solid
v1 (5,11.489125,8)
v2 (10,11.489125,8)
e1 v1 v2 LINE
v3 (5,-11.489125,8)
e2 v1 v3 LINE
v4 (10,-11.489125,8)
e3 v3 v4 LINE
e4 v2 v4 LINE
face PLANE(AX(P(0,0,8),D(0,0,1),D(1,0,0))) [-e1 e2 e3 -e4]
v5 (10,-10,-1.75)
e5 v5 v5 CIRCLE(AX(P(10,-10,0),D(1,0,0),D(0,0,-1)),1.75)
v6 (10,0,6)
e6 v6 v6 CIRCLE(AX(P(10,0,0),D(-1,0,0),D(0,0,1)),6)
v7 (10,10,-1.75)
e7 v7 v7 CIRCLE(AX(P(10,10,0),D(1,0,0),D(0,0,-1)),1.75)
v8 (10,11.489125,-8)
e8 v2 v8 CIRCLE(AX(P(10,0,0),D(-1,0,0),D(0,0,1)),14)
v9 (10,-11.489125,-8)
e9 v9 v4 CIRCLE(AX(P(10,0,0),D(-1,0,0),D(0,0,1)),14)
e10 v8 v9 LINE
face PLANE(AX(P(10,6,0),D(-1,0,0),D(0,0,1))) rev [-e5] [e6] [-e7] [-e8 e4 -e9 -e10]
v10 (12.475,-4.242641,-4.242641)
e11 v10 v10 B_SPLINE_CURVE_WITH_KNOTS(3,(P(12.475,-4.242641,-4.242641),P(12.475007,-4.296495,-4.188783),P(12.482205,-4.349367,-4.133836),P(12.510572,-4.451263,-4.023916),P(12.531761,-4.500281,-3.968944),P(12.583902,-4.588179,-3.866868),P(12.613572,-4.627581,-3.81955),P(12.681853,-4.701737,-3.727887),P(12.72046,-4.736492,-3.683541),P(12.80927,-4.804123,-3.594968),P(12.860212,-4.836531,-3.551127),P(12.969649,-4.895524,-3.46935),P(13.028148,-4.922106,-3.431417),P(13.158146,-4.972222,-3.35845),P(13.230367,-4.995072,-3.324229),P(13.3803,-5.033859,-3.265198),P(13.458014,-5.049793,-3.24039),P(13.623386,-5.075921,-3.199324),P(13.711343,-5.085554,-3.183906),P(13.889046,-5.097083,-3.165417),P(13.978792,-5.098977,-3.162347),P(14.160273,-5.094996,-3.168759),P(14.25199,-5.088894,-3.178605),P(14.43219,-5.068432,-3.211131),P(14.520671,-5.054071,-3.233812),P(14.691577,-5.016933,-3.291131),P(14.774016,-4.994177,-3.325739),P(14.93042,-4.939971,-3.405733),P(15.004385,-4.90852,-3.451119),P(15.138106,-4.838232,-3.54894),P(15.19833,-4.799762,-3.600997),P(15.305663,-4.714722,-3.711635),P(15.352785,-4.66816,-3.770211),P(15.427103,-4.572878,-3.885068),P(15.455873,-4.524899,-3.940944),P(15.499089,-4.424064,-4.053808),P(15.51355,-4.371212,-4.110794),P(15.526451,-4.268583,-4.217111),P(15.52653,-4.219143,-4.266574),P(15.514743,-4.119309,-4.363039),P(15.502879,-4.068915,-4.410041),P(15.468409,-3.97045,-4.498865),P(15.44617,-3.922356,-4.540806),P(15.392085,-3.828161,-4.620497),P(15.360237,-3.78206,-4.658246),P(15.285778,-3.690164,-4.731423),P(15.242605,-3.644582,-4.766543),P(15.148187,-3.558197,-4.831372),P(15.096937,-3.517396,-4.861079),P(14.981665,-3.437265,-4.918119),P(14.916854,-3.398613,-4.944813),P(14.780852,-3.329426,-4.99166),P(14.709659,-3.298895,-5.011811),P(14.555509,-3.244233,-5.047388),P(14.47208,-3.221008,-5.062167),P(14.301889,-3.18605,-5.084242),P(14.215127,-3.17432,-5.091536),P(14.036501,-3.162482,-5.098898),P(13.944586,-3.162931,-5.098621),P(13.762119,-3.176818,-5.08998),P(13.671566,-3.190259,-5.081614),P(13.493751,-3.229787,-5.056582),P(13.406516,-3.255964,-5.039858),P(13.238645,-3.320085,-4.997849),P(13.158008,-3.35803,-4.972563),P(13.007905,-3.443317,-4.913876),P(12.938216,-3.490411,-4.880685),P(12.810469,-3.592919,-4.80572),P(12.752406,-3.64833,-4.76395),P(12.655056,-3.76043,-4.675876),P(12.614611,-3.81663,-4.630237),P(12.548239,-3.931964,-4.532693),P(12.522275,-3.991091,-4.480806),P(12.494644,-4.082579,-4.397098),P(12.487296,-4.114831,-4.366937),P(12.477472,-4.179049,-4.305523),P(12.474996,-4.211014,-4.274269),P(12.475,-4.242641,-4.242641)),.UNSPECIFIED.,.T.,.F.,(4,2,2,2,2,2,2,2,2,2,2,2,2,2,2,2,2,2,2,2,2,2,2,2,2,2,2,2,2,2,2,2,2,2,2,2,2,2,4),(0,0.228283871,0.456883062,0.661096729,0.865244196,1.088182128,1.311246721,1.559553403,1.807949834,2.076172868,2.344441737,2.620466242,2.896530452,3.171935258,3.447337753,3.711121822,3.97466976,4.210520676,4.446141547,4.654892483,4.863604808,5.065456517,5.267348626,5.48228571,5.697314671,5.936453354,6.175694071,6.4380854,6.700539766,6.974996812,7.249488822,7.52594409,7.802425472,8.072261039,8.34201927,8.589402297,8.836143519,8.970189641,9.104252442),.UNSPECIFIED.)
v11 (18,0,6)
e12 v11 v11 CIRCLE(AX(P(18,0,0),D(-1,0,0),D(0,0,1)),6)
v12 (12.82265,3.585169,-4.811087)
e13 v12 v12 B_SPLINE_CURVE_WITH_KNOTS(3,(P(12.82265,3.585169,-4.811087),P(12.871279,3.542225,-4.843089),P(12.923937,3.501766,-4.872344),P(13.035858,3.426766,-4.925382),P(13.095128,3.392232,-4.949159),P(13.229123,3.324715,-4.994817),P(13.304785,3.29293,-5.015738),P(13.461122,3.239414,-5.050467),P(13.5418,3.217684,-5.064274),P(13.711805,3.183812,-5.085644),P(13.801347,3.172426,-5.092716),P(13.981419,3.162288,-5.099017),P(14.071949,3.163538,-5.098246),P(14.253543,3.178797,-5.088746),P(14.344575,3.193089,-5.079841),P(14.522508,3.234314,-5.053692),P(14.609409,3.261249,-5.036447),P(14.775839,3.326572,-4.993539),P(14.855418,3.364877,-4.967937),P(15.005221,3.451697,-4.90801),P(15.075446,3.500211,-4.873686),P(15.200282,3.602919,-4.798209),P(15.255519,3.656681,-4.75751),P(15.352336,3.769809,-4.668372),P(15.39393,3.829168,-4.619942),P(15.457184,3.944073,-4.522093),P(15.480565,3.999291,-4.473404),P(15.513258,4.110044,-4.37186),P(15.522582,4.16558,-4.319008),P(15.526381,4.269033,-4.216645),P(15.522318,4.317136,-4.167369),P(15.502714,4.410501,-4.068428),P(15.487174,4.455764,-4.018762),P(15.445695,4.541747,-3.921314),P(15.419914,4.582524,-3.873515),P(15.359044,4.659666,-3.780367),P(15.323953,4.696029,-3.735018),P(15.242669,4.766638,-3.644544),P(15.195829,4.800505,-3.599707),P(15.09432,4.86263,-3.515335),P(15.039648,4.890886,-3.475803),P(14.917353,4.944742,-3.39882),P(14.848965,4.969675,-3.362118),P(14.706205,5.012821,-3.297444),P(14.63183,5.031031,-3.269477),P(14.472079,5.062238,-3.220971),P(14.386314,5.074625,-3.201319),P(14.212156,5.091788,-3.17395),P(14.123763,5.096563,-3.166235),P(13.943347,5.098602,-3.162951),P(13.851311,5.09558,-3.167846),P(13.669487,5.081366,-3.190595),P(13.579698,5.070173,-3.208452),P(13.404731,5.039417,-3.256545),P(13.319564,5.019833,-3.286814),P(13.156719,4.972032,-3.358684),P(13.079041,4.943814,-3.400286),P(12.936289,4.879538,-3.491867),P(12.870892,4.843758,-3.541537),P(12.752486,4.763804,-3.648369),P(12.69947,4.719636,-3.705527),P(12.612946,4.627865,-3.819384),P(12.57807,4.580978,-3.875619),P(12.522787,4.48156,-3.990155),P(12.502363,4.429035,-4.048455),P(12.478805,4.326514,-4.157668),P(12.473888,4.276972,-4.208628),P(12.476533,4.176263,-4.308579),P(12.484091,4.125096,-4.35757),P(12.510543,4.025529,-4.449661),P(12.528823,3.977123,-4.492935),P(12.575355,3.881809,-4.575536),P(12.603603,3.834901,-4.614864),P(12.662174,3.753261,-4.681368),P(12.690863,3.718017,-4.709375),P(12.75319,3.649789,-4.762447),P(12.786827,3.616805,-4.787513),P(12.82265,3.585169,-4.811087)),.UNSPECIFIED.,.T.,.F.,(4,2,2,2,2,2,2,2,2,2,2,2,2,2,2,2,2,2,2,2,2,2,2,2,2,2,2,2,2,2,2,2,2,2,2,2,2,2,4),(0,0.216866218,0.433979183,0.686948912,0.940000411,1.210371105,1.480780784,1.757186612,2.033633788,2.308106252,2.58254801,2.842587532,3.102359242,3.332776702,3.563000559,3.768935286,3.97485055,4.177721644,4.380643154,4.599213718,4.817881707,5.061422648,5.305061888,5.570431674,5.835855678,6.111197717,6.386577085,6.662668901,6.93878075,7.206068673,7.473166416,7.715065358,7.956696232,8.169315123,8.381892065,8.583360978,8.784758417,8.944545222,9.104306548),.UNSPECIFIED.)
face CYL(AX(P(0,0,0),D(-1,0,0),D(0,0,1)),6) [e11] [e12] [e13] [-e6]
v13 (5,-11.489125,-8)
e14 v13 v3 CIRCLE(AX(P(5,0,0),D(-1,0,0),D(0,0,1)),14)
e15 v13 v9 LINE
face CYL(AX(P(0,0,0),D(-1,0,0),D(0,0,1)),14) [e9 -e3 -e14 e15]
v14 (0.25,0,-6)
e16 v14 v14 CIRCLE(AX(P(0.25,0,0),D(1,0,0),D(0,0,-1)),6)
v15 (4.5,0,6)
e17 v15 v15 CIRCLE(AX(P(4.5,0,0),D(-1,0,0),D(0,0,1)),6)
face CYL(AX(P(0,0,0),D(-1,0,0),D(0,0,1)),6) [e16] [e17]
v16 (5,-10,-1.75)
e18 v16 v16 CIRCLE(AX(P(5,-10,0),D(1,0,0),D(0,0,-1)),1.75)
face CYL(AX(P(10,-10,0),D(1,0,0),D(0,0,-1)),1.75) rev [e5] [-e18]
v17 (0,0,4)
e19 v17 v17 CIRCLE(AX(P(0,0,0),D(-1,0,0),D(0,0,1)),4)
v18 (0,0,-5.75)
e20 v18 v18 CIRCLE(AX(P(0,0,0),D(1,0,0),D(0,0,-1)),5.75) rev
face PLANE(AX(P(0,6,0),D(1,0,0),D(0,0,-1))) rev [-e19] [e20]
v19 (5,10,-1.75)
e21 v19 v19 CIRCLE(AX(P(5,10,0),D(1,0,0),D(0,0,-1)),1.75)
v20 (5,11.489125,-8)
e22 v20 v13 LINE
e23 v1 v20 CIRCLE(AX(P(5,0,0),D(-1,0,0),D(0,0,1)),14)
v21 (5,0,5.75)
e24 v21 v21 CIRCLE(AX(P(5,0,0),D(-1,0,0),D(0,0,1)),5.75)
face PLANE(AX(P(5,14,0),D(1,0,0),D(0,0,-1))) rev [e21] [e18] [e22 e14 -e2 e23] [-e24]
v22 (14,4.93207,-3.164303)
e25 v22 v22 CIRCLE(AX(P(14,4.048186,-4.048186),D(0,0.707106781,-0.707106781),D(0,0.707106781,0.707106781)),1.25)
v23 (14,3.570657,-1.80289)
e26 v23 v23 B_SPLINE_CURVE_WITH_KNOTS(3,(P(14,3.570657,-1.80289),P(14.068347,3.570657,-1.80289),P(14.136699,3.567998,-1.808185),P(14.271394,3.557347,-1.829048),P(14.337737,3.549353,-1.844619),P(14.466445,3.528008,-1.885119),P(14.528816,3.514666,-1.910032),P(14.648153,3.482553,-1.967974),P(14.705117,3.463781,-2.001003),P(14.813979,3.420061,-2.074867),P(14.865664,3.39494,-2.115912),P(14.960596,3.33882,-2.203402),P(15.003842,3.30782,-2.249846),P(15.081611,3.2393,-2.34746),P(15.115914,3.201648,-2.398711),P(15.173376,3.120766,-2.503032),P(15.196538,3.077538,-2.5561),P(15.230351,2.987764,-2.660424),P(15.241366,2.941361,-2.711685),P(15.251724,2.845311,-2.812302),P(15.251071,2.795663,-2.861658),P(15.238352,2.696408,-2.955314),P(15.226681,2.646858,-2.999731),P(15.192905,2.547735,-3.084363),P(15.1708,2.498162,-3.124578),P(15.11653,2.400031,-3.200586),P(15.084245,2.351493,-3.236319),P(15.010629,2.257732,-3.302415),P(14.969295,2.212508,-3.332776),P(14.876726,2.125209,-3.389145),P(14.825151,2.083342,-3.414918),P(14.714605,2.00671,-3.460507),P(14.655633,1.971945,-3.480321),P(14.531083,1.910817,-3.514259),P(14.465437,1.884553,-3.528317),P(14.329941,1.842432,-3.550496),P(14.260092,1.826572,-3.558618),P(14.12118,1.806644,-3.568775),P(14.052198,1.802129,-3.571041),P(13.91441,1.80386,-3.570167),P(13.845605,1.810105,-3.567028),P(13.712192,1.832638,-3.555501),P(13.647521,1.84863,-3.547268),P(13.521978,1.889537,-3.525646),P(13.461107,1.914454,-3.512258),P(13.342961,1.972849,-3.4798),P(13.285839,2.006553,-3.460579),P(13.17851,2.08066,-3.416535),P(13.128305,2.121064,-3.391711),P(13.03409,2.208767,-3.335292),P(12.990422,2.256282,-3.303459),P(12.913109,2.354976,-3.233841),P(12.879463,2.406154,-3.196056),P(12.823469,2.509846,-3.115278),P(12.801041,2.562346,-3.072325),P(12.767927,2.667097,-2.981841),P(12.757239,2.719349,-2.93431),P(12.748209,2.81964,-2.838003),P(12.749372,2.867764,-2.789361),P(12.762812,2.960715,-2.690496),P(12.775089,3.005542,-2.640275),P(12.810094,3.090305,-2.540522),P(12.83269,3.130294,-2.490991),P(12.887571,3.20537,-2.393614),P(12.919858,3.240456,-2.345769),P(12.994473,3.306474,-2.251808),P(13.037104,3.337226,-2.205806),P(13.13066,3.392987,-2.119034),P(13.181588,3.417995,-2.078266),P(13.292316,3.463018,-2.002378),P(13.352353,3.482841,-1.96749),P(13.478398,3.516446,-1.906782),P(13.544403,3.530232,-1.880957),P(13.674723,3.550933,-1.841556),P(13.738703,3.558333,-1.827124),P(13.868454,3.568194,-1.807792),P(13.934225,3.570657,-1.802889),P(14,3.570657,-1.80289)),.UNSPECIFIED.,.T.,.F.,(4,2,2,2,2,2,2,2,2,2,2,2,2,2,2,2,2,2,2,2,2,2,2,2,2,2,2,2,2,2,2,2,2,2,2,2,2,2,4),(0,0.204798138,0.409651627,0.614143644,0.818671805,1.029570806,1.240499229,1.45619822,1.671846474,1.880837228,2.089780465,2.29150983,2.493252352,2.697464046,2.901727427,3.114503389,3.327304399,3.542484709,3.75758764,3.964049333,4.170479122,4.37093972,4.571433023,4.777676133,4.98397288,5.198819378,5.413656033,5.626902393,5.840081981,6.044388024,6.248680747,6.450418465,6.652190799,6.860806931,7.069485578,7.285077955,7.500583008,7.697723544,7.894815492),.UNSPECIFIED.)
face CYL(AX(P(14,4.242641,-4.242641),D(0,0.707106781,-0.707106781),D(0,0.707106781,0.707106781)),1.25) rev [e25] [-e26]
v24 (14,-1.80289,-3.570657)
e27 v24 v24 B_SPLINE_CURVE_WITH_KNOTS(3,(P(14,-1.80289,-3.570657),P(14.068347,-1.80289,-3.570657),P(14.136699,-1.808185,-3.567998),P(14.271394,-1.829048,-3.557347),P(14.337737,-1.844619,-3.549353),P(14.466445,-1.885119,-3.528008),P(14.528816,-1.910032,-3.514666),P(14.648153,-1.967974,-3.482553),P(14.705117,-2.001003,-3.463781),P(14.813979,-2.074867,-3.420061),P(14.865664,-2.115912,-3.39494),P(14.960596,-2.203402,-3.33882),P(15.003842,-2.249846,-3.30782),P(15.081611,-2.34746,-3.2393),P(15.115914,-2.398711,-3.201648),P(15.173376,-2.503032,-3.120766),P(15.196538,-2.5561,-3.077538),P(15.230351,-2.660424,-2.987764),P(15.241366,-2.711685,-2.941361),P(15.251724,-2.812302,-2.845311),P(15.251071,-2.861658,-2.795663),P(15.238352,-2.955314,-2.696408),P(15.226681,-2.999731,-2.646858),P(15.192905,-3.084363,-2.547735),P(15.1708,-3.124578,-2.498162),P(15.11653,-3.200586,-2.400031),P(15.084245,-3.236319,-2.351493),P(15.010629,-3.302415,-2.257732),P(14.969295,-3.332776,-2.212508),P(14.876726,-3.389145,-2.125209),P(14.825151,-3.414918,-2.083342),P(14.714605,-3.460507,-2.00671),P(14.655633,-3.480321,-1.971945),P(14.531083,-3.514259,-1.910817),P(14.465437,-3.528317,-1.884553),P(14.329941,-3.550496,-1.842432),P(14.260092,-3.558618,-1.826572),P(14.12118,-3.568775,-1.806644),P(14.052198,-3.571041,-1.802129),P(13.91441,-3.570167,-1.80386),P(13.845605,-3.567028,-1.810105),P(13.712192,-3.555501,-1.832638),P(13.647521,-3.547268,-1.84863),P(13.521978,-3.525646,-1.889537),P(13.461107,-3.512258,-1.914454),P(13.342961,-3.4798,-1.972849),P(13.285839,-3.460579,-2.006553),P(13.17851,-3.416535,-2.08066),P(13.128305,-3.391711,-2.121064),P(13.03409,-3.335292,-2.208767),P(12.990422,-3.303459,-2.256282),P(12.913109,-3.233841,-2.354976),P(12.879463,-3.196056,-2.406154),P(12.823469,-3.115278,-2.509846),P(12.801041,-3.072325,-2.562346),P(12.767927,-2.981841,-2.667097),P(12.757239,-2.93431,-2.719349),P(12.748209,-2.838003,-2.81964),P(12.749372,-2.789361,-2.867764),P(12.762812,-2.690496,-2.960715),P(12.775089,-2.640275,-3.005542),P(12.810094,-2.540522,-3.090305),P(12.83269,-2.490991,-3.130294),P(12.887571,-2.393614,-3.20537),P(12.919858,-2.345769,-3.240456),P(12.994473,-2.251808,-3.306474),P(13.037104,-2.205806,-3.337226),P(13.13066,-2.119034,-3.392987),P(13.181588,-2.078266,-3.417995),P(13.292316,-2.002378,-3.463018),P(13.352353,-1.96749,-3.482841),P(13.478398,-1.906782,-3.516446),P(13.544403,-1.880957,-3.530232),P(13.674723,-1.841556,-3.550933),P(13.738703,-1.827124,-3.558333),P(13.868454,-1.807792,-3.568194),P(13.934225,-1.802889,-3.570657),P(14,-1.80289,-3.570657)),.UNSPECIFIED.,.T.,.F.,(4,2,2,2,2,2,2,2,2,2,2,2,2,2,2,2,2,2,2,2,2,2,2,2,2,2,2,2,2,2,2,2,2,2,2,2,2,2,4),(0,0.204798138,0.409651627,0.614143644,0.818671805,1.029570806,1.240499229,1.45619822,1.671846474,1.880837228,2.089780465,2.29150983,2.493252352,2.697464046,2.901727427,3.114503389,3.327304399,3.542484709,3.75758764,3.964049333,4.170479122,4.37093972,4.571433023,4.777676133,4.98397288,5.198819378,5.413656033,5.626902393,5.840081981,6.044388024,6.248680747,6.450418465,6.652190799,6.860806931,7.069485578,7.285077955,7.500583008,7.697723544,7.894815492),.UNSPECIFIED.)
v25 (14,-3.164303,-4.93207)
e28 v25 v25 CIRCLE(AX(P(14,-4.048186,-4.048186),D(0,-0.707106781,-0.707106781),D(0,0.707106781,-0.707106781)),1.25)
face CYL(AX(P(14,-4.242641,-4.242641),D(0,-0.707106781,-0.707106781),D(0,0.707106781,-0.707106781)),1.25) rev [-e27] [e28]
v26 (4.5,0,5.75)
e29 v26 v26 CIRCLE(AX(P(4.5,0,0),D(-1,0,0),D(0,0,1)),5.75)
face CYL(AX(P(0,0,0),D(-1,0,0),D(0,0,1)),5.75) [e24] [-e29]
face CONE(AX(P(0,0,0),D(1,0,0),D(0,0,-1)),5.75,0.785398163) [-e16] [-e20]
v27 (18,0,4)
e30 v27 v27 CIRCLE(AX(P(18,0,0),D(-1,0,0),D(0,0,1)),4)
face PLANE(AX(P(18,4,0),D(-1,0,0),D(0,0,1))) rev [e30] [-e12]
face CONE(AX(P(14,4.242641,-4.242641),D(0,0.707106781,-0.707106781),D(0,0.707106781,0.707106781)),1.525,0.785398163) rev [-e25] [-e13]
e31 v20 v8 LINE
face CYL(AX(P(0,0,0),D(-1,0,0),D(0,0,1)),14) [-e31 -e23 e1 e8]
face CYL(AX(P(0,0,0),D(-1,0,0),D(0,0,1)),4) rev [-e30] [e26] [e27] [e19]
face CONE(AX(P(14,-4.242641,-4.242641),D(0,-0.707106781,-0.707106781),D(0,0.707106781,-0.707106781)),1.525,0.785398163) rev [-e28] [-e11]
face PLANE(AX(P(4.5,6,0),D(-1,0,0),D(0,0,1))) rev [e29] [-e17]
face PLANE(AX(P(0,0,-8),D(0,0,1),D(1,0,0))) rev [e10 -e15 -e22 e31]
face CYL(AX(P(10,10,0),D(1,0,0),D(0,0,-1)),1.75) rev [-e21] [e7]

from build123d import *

# Parameters (mm, degrees)
CUT_EXTRUDE_1_DEPTH = 23.181073013
CHAMFER_1_SIZE      = 0.25
HOLE_WIZARD_1_D     = 3.5


# Read off the part's stored shape, not the designer's step: M3 螺纹孔3
with BuildPart() as part:
    # 草图2 → 旋转1 (revolve)
    with BuildSketch(Plane.XY, mode=Mode.PRIVATE) as revolve_1_sk:
        Polygon((18, 4), (18, 6), (10, 6), (10, 14), (5, 14), (5, 5.75), (4.5, 5.75), (4.5, 6), (0, 6), (0, 4), align=None)
    revolve(revolve_1_sk.sketch.rotate(Axis((0, 0, 0), (1, 0, 0)), 90), axis=Axis((0, 0, 0), (1, 0, 0)))

    # 草图3 → 切除-拉伸1 (cut, through all)
    with BuildSketch(Plane(origin=(10, 0, 0), x_dir=(0, 0, -1), z_dir=(1, 0, 0))):
        with BuildLine():
            Line((-8, -11.489125293), (-8, 11.489125293))
            ThreePointArc((-8, 11.489125293), (-14, 0), (-8, -11.489125293))
        make_face()
        with BuildLine():
            ThreePointArc((14, 0), (12.409673646, 6.480740698), (8, 11.489125293))
            Line((8, 11.489125293), (8, -11.489125293))
            ThreePointArc((8, -11.489125293), (12.409673646, -6.480740698), (14, 0))
        make_face()
    extrude(amount=-CUT_EXTRUDE_1_DEPTH, mode=Mode.SUBTRACT)

    # 倒角1
    chamfer_1_edges = [part.edges().sort_by_distance(p)[0] for p in [
        (0, 0, -6),
    ]]
    chamfer(chamfer_1_edges, length=CHAMFER_1_SIZE)

    # 孔1 (through all)
    with Locations(Plane(origin=(10, 0, 0), x_dir=(0, 0, -1), z_dir=(1, 0, 0))):
        with Locations((0, 10), (0, -10)):
            Hole(HOLE_WIZARD_1_D / 2)

    # M3 螺纹孔3 outline → M3 螺纹孔3 (revolve, cut)
    with BuildSketch(Plane(origin=(14, 0, 0), x_dir=(1, 0, 0), z_dir=(0, 0.707106781186545, 0.70710678118655))):
        Polygon((1.525087405, 6.000087405), (0, 6.000087405), (0, 3.799554737), (1.25, 3.799554737), (1.25, 5.725), align=None)
    revolve(axis=Axis((14, 0, 0), (0, 0.70710678118655, -0.707106781186545)), mode=Mode.SUBTRACT)

    # Hole Wizard M3 _3 2 outline → Hole Wizard M3 _3 2 (revolve, cut)
    with BuildSketch(Plane(origin=(14, 0, 0), x_dir=(1, 0, 0), z_dir=(0, -0.707106781186542, 0.707106781186553))):
        Polygon((0, -6.000094082), (1.525094082, -6.000094082), (1.25, -5.725), (1.25, -3.799554737), (0, -3.799554737), align=None)
    revolve(axis=Axis((14, 0, 0), (0, 0.707106781186553, 0.707106781186542)), mode=Mode.SUBTRACT)


solid = part.part
